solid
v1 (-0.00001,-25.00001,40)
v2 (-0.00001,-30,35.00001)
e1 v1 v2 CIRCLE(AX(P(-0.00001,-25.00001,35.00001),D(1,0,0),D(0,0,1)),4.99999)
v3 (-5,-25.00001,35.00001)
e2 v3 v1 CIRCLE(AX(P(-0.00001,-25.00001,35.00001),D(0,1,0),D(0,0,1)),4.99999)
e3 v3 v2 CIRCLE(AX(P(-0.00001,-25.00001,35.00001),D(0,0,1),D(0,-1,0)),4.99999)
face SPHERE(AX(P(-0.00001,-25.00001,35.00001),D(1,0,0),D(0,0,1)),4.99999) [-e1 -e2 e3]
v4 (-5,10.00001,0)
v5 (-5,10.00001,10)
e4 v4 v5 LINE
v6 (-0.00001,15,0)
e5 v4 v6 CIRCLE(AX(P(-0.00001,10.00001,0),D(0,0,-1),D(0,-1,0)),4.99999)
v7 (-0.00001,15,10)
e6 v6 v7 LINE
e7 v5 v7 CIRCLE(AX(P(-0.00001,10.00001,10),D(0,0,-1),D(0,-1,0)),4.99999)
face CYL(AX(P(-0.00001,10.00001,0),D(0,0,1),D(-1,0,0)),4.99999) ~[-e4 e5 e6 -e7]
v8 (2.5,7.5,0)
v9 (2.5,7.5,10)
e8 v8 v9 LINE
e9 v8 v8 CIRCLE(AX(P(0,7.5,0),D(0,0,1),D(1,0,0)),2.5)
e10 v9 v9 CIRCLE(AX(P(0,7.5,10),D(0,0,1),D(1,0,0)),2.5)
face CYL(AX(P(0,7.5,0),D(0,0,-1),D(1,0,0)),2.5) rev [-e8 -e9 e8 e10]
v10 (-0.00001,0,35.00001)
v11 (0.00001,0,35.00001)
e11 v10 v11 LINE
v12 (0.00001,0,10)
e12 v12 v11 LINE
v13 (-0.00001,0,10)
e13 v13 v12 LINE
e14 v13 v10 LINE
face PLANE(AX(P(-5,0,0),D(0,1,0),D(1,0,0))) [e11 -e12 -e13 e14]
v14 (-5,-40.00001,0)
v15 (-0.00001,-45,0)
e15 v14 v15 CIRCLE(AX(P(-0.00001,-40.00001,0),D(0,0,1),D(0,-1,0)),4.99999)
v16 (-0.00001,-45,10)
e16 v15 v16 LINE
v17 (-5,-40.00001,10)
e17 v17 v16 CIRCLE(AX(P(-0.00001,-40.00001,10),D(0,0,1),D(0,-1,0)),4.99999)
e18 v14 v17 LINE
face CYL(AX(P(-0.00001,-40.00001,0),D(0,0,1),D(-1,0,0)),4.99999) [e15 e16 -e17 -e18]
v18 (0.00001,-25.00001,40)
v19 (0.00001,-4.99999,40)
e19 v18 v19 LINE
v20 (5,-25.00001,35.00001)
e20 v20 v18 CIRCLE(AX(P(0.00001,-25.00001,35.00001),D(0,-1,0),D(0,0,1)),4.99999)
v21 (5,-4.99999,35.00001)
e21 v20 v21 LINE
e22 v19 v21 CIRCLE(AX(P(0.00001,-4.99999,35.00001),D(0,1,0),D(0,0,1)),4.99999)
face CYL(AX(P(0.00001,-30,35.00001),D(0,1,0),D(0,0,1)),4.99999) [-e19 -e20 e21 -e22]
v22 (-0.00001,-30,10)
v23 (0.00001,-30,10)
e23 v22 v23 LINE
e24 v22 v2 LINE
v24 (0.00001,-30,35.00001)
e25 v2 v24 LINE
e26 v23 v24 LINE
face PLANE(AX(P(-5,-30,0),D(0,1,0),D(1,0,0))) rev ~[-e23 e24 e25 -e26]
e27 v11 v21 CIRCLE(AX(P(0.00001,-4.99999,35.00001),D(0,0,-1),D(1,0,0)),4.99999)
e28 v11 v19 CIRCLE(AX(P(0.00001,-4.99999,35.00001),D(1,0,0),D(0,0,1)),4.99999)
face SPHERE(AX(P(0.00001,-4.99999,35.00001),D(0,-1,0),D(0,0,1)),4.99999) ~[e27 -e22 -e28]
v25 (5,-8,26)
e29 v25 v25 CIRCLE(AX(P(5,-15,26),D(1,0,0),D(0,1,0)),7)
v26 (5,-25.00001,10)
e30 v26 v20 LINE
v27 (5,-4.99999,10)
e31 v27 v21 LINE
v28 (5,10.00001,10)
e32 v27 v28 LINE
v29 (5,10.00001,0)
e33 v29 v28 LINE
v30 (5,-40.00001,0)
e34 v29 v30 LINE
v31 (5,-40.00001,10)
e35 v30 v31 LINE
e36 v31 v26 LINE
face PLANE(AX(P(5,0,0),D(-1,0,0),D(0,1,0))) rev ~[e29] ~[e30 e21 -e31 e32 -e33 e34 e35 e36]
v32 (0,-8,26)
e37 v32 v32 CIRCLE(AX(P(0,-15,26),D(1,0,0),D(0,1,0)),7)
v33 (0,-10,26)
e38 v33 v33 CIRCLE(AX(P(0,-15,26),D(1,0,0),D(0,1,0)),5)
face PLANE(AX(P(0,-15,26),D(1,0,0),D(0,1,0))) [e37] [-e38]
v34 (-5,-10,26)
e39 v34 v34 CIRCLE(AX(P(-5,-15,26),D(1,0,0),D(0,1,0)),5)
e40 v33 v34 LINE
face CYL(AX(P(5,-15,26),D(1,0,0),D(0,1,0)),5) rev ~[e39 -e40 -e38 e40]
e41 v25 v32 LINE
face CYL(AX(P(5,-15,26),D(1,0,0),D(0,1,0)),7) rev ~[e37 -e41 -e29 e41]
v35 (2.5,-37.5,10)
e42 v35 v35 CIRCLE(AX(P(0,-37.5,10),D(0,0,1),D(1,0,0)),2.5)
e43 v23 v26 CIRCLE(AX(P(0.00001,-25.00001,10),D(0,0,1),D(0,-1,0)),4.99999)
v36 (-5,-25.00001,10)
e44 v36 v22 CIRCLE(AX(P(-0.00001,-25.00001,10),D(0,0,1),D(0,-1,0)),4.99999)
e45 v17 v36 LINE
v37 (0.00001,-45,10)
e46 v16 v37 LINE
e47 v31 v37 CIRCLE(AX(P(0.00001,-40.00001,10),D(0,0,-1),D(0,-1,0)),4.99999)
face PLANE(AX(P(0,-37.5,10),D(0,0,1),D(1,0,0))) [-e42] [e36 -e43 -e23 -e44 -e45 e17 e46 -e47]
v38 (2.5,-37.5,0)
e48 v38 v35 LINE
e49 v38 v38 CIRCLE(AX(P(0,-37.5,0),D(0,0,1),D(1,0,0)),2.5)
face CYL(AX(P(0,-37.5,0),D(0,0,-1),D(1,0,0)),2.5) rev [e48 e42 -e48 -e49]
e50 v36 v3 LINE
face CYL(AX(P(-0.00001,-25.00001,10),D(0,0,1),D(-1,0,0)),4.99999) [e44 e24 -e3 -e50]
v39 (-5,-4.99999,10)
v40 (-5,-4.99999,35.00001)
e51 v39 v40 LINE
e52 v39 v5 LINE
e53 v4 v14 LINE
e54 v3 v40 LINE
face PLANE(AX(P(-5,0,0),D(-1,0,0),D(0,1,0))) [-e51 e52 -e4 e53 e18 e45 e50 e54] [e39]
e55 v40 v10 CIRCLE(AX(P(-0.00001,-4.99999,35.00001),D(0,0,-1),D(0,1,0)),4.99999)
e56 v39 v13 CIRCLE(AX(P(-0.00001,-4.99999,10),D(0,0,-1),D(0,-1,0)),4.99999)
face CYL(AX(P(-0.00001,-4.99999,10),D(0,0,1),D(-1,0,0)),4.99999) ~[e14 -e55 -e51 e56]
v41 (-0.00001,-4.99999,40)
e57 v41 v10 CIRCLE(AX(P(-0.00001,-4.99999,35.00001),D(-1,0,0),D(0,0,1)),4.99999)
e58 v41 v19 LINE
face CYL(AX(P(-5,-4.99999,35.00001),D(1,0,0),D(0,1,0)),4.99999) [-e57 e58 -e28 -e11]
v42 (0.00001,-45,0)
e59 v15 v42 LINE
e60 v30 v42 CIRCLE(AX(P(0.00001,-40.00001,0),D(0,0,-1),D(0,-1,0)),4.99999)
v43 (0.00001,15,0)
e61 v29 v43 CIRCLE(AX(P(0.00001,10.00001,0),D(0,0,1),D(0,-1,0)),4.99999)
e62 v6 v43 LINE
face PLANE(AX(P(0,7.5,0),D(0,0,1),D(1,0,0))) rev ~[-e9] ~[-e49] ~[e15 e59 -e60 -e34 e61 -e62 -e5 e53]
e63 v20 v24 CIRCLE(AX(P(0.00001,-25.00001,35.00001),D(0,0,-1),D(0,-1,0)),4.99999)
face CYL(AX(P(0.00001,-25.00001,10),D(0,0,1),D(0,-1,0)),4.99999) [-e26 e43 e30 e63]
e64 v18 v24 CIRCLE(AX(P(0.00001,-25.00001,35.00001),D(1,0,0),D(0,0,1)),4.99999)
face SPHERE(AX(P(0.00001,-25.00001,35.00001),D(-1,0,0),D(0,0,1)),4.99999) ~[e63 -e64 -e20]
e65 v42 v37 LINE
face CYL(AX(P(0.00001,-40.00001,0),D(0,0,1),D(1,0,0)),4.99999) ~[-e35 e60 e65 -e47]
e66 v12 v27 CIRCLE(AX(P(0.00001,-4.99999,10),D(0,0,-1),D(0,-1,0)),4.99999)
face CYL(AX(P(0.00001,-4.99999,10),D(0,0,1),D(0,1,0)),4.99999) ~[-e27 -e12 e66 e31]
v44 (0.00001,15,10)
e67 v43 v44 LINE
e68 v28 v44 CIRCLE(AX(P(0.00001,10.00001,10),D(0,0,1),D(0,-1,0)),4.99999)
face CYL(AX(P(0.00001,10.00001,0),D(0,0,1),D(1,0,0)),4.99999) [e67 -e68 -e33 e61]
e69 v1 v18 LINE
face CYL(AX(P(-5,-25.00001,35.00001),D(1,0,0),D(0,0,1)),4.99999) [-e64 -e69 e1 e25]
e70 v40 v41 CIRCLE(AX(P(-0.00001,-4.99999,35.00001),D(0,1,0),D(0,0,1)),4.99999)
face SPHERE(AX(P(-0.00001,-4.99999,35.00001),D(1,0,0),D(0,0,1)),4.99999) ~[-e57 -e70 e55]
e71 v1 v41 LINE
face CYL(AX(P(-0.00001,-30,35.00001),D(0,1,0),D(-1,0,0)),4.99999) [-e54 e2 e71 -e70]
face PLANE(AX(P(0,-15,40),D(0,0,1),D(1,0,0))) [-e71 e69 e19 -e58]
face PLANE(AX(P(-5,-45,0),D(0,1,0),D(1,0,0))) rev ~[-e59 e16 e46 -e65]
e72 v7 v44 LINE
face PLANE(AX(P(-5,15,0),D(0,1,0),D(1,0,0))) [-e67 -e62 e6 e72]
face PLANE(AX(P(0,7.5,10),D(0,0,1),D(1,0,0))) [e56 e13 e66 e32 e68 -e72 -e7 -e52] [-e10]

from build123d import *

# Parameters (mm, degrees)
F0_W     = 10
F0_H     = 30
F1_DEPTH = 40
F0_H_2   = 15
F0_R     = 2.5
F2_DEPTH = 10
F3_R     = 5
F4_DEPTH = 25
F3_R_2   = 7
F5_DEPTH = 5
F6_R     = 4.99999
F7_R     = 4.99999


# Not quite as in the source:
# - a fillet or chamfer is up to 0.001 mm smaller than in the source, because OpenCascade refuses the exact size


with BuildPart() as f1:
    # F0 (on Top) → F1 (new body)
    with BuildSketch(Plane.XY):
        with Locations((0, -15)):
            Rectangle(F0_W, F0_H)
    extrude(amount=F1_DEPTH)

    # F0 (on Top) → F2 (join)
    with BuildSketch(Plane.XY):
        with Locations((0, 7.5)):
            Rectangle(F0_W, F0_H_2)
        with Locations((0, 7.5)):
            Circle(F0_R, mode=Mode.SUBTRACT)
        with Locations((0, -37.5)):
            Rectangle(F0_W, F0_H_2)
        with Locations((0, -37.5)):
            Circle(F0_R, mode=Mode.SUBTRACT)
    extrude(amount=F2_DEPTH)

    # F3 (on face) → F4 (cut)
    with BuildSketch(Plane.YZ.offset(5)):
        with Locations((-15, 26)):
            Circle(F3_R)
    extrude(amount=-F4_DEPTH, mode=Mode.SUBTRACT)

    # F3 (on face) → F5 (cut)
    with BuildSketch(Plane.YZ.offset(5)):
        with Locations((-15, 26)):
            Circle(F3_R_2)
        with Locations((-15, 26)):
            Circle(F3_R, mode=Mode.SUBTRACT)
    extrude(amount=-F5_DEPTH, mode=Mode.SUBTRACT)

    # F6 (radius 5 in the source; OpenCascade refuses exactly that, so slightly less here)
    f6_edges = [f1.edges().sort_by_distance(p)[0] for p in [
        (0, -30, 40),
        (5, -15, 40),
        (0, 0, 40),
        (-5, -15, 40),
        (5, 0, 25),
        (5, -30, 25),
        (-5, -30, 25),
        (-5, 0, 25),
    ]]
    fillet(f6_edges, radius=F6_R)

    # F7 (radius 5 in the source; OpenCascade refuses exactly that, so slightly less here)
    f7_edges = [f1.edges().sort_by_distance(p)[0] for p in [
        (5, 15, 5),
        (-5, 15, 5),
        (5, -45, 5),
        (-5, -45, 5),
    ]]
    fillet(f7_edges, radius=F7_R)


solid = f1.part
